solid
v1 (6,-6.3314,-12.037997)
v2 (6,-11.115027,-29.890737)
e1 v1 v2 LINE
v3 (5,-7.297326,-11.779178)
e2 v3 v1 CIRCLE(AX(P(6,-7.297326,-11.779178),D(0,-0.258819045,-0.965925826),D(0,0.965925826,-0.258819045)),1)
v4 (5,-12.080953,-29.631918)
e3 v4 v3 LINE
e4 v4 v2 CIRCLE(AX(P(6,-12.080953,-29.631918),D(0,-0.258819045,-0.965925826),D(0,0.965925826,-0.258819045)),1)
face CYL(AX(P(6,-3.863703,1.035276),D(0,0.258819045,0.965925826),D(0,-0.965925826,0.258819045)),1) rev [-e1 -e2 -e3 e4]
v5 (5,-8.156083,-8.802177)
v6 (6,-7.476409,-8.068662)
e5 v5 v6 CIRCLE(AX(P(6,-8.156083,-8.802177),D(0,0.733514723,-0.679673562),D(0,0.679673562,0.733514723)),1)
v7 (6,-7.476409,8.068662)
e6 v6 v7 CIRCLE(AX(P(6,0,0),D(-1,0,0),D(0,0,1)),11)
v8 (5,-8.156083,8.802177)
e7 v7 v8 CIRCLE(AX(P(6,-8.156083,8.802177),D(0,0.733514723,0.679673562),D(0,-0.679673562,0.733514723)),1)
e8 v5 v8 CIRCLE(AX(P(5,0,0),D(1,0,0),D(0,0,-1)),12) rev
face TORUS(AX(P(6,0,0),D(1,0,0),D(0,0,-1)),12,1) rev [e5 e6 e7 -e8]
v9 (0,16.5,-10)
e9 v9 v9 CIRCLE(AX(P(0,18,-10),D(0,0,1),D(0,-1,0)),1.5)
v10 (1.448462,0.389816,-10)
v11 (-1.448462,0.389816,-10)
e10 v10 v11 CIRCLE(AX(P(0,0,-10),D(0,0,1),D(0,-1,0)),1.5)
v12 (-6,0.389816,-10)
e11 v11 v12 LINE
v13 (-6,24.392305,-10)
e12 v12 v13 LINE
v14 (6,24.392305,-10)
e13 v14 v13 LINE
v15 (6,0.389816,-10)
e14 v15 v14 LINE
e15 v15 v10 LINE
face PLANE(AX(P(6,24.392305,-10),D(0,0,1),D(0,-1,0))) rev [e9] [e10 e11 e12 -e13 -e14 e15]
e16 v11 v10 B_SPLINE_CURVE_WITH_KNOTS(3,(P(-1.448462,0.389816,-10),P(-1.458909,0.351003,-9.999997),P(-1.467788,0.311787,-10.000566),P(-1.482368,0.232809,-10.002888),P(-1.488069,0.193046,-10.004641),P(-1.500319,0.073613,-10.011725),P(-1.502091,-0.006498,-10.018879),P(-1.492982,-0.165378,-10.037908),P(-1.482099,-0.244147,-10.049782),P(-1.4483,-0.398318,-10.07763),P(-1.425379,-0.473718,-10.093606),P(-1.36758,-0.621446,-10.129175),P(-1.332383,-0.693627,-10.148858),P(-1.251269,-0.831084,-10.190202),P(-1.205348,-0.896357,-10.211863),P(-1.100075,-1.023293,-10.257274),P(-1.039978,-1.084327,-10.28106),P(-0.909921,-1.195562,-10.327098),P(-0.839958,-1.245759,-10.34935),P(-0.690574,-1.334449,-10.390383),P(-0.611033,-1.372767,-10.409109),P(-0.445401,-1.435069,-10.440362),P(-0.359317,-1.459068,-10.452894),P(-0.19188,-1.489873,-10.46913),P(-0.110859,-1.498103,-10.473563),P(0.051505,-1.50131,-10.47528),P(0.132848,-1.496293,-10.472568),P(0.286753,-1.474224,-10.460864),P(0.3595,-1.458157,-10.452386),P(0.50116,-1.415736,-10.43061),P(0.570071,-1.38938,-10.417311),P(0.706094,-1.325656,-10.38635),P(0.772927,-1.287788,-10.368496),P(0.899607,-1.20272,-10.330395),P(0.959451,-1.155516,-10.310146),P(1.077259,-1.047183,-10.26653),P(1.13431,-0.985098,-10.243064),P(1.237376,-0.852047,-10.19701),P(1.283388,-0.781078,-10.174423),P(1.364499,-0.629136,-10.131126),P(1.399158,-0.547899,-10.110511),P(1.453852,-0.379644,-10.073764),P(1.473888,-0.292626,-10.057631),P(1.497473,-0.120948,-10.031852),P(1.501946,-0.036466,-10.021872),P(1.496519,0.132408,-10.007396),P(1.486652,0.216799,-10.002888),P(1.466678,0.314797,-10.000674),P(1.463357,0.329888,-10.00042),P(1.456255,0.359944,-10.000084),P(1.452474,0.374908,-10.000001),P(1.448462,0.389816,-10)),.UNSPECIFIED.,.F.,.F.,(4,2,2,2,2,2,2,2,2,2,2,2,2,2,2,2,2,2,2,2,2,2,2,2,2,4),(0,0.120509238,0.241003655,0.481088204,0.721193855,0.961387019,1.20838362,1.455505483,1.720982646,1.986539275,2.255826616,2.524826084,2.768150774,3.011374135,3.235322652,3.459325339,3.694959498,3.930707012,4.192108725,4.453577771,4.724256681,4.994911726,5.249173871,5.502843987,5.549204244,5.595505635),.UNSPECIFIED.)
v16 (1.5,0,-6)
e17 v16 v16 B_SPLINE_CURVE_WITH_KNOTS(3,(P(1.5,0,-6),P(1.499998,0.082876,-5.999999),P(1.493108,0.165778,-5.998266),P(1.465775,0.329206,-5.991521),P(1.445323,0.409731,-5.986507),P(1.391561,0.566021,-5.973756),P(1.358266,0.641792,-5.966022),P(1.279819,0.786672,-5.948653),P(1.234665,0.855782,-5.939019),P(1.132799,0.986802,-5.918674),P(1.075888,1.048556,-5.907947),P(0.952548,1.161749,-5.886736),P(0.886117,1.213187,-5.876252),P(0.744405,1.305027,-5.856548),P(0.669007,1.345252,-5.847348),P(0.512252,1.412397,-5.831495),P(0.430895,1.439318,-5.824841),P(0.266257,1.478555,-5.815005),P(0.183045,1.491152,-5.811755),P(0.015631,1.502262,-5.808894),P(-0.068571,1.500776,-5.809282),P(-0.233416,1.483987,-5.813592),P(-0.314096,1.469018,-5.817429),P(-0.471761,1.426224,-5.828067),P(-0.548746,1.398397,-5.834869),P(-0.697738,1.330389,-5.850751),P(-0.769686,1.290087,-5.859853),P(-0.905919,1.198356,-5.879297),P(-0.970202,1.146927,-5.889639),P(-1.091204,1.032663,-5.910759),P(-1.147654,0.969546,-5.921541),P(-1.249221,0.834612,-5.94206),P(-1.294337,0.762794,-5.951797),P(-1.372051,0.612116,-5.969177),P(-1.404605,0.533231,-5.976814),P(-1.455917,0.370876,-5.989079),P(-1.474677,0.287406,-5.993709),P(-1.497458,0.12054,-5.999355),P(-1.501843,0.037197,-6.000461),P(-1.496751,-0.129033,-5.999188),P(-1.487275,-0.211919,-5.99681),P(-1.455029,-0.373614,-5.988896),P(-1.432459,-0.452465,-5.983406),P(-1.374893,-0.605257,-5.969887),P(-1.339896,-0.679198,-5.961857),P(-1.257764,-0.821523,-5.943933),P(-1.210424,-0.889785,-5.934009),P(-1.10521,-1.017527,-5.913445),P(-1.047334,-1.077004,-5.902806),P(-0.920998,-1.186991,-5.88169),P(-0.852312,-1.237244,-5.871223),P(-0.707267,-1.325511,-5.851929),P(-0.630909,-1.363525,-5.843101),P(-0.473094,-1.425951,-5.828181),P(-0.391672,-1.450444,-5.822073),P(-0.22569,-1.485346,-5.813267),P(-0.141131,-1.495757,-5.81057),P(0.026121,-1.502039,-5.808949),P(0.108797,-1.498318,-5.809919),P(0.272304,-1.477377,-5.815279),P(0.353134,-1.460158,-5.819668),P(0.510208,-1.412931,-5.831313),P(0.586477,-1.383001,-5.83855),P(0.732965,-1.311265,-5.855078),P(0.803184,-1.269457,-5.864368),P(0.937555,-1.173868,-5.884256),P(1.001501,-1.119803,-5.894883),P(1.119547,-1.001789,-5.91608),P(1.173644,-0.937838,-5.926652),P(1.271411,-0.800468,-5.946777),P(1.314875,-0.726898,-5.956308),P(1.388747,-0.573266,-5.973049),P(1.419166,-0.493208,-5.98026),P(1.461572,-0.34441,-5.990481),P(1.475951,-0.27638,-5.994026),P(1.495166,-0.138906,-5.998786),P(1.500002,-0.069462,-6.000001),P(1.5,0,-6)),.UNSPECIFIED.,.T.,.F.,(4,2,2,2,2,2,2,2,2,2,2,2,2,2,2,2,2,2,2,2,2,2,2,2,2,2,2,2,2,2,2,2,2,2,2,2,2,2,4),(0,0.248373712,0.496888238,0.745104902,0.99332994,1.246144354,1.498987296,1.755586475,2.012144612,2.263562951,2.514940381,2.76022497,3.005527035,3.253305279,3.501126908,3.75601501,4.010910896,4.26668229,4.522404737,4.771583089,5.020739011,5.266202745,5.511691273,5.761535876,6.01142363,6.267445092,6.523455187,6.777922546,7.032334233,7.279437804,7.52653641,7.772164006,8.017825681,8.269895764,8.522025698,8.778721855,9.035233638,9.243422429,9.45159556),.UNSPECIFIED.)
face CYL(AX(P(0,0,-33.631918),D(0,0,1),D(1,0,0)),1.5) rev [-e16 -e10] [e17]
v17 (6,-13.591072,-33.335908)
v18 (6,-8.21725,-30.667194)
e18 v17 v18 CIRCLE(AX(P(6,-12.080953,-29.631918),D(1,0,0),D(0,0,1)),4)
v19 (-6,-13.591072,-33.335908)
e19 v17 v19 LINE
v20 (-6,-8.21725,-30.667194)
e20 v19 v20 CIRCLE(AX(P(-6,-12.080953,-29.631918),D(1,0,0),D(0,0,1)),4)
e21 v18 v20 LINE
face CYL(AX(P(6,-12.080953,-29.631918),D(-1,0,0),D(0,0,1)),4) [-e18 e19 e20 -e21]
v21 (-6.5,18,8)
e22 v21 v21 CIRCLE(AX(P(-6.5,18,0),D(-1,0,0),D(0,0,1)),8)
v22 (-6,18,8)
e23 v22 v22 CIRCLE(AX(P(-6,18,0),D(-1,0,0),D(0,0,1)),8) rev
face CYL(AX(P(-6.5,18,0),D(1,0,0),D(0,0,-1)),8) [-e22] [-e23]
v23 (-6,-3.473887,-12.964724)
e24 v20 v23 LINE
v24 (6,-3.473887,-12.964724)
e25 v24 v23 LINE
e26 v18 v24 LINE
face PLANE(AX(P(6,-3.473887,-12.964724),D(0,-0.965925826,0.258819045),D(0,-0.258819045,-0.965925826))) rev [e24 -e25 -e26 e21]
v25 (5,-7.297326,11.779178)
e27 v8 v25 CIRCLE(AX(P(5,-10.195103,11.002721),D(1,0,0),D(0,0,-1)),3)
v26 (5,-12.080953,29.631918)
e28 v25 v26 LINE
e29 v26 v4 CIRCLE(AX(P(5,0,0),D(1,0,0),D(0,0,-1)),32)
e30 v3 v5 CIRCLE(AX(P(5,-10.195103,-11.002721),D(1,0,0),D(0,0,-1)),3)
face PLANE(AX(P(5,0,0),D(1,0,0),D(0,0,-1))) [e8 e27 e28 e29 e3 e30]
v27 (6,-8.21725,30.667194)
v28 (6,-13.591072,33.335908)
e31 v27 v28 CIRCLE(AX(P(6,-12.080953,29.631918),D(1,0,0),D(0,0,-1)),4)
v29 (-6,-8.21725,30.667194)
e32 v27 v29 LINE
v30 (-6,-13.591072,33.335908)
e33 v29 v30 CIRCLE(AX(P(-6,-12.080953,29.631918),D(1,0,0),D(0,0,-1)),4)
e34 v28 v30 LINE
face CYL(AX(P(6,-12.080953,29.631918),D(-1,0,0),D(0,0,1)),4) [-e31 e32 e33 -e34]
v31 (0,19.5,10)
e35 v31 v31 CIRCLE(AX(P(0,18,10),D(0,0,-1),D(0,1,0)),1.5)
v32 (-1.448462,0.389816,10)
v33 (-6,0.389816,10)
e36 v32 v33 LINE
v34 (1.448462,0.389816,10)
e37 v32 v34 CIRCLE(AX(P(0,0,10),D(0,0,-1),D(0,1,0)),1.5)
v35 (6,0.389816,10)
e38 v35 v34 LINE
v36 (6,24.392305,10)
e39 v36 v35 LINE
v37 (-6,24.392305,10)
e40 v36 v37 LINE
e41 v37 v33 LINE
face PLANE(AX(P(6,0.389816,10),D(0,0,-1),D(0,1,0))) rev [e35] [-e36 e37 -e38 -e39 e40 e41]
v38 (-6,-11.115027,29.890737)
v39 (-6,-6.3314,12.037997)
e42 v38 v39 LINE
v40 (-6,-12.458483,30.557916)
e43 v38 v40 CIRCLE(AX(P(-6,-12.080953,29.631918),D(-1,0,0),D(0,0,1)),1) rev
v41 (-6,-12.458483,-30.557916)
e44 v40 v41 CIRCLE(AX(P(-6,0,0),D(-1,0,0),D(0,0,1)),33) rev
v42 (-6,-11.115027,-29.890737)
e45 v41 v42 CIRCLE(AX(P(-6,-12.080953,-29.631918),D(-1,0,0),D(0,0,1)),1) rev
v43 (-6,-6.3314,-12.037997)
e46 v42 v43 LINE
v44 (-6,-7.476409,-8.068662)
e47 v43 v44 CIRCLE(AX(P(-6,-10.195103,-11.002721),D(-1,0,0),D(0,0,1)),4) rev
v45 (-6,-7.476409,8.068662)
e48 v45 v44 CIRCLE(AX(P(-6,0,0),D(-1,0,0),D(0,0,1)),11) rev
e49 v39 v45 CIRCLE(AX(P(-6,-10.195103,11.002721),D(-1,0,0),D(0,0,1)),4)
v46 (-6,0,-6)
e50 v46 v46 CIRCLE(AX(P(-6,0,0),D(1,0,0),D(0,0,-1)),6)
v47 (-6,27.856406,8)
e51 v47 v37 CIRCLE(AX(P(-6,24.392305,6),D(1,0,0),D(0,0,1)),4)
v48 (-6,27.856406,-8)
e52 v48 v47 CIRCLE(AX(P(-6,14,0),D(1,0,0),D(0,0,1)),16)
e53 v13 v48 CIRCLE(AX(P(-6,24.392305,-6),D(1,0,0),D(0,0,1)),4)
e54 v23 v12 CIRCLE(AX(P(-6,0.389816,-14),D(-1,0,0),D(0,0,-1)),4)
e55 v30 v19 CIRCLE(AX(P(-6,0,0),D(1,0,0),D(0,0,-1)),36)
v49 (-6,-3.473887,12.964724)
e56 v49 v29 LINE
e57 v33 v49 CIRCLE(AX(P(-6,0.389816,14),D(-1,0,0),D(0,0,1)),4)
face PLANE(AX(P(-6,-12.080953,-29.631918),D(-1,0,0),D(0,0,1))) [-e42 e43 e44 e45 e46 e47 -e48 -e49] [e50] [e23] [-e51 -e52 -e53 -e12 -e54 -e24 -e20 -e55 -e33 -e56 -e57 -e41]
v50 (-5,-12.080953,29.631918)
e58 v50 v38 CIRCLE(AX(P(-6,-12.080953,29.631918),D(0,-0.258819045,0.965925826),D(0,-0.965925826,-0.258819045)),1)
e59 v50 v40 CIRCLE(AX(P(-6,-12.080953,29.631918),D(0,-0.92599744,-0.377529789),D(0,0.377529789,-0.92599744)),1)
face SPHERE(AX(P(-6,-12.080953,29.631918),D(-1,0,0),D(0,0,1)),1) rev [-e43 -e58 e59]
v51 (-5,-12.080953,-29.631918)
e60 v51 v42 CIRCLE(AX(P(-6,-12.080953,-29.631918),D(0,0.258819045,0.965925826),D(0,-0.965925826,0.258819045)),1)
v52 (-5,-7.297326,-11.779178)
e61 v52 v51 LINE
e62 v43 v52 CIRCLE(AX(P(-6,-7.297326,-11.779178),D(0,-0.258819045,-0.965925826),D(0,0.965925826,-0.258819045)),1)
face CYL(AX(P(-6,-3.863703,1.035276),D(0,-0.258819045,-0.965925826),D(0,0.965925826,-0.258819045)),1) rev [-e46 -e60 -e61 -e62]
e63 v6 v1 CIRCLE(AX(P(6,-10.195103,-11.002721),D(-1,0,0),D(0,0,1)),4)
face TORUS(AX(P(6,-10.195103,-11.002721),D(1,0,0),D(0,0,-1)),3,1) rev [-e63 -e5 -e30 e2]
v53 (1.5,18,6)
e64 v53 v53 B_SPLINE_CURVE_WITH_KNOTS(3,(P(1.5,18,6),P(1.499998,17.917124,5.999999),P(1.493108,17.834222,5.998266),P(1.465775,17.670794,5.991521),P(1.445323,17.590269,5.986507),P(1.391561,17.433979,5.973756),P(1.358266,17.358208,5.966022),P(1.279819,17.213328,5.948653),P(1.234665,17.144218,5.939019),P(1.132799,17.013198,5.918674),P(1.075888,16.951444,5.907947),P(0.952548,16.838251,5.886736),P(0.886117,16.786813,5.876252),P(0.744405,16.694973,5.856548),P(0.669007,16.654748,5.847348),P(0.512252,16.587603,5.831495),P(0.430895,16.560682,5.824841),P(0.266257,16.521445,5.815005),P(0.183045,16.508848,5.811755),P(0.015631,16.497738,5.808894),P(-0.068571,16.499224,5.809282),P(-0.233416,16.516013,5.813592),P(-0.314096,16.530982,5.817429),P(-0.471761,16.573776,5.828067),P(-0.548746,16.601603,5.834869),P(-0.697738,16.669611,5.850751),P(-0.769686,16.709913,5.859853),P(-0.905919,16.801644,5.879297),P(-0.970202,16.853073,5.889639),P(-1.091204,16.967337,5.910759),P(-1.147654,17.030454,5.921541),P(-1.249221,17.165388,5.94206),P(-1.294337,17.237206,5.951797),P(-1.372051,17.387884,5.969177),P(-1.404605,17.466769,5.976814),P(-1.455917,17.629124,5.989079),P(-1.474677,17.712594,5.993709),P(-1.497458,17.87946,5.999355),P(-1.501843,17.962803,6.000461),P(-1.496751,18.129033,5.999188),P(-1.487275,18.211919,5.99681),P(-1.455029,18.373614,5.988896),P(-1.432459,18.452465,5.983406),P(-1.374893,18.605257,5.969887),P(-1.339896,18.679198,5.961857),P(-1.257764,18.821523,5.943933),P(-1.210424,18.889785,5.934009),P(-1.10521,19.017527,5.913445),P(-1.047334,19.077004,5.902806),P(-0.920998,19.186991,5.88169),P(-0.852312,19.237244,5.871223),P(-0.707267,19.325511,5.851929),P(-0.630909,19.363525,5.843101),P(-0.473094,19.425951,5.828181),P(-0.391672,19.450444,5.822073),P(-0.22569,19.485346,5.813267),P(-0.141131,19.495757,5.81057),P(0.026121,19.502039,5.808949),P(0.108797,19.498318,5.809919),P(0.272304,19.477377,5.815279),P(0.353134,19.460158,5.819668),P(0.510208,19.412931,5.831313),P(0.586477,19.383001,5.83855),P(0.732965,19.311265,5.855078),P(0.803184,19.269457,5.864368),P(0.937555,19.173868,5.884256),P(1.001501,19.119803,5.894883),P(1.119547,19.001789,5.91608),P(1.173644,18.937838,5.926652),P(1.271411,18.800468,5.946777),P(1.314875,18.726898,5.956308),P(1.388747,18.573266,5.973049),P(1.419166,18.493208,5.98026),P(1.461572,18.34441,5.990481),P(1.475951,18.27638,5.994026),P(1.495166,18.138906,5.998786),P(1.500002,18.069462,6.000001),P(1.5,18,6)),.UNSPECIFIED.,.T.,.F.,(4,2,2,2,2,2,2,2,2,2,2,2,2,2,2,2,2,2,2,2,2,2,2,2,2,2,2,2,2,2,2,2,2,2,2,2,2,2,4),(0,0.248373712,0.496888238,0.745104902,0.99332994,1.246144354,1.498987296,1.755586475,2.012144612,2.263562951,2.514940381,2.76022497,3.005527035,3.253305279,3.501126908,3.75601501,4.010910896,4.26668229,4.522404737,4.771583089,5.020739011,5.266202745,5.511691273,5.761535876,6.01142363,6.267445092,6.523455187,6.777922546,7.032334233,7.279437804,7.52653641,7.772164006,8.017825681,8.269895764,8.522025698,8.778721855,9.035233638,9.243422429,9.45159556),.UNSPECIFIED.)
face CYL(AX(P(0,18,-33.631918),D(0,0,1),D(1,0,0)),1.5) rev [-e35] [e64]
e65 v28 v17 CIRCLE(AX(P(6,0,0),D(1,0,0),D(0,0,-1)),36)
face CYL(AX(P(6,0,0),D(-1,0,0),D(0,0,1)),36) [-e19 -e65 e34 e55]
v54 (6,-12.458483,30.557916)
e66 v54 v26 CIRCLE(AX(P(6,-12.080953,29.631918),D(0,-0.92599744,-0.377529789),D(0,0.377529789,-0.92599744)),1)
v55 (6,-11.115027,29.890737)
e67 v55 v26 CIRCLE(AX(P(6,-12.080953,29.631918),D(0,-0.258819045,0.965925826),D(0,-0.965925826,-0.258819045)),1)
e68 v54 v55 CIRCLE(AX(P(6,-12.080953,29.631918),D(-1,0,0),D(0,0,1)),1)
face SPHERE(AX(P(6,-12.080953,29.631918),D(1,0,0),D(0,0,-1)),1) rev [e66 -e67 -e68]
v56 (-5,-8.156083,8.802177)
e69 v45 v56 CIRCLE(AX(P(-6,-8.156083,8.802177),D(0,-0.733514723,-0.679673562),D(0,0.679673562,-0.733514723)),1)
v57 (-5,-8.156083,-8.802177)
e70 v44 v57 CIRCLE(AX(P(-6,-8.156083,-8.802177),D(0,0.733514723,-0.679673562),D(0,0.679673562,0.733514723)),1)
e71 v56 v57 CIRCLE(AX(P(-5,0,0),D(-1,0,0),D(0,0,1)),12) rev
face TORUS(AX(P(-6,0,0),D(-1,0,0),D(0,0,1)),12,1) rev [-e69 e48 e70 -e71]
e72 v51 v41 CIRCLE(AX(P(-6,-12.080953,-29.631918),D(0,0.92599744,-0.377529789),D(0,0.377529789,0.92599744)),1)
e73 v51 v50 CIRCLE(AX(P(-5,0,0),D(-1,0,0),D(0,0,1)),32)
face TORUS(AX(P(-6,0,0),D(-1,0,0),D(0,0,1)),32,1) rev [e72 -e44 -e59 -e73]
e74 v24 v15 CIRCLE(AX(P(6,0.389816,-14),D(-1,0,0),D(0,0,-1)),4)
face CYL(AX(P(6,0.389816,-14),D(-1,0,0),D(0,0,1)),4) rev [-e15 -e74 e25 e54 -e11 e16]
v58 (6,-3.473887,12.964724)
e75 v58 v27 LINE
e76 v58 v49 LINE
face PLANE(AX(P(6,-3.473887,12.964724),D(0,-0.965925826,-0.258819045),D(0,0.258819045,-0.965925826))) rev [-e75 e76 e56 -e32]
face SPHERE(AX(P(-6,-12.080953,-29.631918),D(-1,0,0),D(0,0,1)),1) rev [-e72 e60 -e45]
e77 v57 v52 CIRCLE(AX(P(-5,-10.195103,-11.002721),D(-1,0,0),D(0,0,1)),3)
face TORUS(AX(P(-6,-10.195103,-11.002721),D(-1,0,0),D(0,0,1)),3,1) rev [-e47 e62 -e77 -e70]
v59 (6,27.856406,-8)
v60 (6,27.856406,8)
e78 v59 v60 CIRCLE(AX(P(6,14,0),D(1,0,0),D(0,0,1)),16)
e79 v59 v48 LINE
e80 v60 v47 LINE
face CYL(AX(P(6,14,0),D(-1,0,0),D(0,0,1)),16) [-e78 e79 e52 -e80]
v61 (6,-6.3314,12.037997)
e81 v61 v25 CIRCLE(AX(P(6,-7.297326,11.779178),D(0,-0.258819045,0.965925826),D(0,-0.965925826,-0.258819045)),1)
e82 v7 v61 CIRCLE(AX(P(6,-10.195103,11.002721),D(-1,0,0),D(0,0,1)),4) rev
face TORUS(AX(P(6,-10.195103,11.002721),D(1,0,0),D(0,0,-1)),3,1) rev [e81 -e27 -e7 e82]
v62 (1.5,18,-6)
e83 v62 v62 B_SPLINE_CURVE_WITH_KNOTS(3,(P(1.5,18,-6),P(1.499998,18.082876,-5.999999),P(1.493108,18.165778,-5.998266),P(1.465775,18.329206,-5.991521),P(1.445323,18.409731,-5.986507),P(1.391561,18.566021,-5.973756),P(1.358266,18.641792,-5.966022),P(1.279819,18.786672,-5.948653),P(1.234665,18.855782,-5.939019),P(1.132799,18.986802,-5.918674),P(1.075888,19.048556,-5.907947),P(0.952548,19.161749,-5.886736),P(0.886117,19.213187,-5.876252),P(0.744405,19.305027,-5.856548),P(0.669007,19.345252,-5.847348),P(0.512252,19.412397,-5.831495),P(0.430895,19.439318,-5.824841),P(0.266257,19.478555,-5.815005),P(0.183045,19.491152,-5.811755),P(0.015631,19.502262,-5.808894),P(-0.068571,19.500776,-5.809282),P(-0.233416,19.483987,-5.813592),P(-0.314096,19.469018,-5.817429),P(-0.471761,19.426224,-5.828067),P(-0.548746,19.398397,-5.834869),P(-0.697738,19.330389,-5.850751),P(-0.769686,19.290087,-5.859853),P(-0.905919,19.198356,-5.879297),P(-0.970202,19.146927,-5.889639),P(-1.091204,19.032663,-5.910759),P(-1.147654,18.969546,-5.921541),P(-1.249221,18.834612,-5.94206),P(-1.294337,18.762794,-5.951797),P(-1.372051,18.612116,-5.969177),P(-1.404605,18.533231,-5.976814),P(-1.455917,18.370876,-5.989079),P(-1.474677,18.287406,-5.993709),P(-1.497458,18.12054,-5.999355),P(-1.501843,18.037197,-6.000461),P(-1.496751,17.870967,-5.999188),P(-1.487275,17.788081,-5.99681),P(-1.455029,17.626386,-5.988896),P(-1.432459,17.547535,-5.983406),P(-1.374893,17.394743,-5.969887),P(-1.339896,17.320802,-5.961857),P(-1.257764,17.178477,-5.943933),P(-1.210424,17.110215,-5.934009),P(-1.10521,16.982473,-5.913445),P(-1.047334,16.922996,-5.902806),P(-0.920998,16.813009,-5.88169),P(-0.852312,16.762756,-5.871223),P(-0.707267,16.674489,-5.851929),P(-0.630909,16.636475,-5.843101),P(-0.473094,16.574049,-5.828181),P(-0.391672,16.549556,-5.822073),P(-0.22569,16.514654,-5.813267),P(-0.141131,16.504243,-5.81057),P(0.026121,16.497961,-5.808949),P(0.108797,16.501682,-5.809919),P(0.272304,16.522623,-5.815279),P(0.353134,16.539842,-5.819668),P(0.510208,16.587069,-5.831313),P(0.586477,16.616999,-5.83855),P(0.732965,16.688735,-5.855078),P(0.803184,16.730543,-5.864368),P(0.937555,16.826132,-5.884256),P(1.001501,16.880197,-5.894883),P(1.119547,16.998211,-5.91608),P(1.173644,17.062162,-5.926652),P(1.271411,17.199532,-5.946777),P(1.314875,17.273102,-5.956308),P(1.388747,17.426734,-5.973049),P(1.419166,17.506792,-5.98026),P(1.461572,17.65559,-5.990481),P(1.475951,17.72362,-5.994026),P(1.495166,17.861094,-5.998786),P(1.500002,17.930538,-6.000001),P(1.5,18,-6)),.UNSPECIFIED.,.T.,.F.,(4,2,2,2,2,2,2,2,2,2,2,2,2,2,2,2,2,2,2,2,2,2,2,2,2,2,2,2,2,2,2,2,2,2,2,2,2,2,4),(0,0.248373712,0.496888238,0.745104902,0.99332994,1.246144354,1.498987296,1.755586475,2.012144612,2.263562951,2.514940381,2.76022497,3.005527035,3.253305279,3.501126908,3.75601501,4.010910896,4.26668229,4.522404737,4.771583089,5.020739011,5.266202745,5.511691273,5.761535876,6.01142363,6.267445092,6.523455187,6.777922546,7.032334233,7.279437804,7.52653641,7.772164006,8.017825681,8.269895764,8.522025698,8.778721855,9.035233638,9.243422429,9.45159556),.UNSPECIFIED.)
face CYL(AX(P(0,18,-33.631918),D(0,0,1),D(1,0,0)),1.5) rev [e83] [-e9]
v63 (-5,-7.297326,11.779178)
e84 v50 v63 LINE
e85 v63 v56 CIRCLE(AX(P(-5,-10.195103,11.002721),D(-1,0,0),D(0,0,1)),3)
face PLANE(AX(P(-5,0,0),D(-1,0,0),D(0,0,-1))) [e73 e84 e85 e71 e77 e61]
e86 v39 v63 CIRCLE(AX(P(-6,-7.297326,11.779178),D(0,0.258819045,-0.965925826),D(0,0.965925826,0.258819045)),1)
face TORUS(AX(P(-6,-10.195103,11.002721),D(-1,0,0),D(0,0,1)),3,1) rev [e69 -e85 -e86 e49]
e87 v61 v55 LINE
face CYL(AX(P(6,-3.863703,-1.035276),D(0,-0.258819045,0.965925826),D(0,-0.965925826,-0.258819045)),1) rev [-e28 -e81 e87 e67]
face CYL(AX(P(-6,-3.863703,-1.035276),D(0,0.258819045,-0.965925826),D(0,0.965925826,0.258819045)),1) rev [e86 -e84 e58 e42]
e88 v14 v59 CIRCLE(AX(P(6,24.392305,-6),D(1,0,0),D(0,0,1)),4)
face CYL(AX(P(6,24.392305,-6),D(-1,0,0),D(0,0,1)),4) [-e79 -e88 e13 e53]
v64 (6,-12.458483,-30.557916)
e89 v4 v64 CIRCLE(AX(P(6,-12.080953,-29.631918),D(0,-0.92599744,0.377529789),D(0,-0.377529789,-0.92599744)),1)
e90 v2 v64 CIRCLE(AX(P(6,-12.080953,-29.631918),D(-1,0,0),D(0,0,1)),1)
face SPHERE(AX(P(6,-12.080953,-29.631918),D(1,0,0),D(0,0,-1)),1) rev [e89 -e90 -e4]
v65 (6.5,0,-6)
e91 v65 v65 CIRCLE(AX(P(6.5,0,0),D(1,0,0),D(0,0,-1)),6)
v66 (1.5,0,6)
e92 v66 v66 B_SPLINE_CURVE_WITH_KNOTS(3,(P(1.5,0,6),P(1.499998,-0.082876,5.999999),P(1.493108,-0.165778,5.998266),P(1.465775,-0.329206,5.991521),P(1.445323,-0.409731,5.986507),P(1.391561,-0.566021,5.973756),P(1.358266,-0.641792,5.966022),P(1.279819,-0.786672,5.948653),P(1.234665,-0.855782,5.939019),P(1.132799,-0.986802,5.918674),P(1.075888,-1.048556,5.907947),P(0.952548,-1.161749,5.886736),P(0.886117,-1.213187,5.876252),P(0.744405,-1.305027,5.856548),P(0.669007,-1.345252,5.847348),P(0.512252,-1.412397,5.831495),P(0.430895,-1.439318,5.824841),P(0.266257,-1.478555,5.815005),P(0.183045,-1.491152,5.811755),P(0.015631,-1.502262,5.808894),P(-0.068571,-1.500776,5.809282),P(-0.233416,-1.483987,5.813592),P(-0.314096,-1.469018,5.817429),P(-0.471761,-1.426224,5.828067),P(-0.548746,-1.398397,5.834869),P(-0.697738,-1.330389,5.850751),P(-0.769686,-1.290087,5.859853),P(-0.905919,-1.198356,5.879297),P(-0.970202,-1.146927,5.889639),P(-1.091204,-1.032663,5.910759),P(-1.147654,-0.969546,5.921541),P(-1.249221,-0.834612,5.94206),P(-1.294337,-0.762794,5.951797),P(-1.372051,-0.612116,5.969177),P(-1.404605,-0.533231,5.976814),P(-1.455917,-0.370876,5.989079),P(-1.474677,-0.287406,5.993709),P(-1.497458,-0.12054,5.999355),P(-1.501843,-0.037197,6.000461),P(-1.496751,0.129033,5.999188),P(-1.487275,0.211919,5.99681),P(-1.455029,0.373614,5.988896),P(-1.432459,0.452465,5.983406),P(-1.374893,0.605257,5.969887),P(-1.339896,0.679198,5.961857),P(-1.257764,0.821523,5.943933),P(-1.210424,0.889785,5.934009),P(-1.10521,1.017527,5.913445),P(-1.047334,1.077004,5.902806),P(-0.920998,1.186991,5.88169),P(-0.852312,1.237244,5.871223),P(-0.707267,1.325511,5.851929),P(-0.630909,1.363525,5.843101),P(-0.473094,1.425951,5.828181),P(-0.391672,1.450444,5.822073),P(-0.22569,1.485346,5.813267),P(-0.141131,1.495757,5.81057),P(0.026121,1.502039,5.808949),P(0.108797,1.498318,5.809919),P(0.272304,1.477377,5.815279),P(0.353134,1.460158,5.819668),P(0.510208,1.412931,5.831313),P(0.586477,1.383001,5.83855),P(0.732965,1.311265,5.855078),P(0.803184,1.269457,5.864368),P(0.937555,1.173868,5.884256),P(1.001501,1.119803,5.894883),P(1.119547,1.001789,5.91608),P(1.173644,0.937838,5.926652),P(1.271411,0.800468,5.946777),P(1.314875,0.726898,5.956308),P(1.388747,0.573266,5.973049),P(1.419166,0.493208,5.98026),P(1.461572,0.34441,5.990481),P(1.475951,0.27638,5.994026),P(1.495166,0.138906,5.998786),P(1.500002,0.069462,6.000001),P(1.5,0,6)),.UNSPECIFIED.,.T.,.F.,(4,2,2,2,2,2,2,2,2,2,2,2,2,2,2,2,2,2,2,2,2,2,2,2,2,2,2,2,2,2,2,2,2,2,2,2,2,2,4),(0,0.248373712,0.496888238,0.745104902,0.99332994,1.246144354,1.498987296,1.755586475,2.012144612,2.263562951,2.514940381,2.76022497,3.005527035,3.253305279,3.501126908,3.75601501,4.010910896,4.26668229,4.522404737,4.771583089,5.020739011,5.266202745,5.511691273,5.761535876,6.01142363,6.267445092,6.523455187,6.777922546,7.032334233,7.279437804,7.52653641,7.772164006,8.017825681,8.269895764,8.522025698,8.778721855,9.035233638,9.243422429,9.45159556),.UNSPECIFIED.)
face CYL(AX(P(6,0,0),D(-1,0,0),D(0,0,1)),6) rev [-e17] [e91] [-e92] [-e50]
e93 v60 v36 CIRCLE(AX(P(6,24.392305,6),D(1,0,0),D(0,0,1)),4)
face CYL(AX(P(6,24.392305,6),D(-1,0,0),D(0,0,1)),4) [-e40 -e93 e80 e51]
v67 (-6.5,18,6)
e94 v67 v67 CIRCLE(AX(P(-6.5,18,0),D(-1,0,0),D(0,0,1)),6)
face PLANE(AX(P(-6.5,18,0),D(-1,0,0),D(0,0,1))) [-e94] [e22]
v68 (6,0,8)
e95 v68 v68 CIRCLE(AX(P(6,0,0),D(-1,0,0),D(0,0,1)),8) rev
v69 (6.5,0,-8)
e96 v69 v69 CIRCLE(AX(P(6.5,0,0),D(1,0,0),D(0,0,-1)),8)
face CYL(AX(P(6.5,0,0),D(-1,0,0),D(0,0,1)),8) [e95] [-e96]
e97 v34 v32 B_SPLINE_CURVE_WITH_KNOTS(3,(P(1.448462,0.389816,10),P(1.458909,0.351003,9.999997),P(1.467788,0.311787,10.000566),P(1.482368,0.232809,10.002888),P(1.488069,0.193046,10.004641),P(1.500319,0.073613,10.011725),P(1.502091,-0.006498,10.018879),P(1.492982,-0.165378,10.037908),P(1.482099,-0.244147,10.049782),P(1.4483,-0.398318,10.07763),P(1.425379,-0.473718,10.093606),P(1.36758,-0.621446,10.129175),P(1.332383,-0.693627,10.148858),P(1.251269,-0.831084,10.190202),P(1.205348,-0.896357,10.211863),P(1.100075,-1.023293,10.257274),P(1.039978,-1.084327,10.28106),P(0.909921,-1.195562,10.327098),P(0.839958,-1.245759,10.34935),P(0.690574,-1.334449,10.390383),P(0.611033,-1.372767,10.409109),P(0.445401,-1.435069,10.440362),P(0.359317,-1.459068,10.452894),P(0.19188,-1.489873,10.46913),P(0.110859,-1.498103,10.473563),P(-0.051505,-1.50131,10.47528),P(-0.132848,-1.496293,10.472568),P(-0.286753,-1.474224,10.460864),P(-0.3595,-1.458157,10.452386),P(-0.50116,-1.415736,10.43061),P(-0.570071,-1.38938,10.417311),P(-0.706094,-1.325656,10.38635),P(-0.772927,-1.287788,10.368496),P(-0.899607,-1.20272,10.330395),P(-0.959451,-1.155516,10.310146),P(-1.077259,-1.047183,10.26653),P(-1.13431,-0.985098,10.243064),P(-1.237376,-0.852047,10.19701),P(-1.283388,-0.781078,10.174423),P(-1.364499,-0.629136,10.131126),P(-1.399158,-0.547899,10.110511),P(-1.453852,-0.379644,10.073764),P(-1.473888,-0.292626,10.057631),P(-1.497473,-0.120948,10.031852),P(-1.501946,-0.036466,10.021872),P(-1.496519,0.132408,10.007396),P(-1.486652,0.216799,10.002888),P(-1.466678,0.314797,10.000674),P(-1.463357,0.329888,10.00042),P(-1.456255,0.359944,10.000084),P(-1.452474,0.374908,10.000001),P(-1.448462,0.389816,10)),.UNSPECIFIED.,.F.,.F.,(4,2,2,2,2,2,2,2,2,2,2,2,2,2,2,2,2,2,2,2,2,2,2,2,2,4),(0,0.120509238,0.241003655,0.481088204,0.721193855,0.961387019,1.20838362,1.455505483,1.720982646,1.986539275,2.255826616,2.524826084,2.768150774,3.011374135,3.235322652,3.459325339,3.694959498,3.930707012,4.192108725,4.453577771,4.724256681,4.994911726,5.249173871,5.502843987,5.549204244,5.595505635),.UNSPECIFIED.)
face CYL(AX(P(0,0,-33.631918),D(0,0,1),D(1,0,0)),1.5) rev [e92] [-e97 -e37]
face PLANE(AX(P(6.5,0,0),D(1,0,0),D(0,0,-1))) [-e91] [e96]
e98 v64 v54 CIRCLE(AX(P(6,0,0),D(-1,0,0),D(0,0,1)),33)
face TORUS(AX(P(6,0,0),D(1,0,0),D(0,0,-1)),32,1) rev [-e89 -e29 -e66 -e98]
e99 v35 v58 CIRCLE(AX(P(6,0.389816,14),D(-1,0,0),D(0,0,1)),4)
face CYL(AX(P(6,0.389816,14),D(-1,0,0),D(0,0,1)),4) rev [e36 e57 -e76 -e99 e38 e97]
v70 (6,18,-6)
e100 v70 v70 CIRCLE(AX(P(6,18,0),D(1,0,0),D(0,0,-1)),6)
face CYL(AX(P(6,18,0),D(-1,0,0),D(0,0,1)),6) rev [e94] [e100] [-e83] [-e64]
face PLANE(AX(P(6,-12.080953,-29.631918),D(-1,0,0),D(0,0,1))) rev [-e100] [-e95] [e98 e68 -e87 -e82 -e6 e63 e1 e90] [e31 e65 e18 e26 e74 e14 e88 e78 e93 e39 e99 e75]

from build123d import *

# Parameters (mm, degrees)
SKETCH1_R               = 6
BOSS_EXTRUDE1_DEPTH     = 6
CUT_EXTRUDE1_DEPTH      = 1
FILLET1_R               = 1
FILLET1_OF_MIRROR1_R    = 1
SKETCH3_R               = 8
SKETCH3_R_2             = 6
BOSS_EXTRUDE2_DEPTH     = 0.5
SKETCH4_R               = 8
SKETCH4_R_2             = 6
BOSS_EXTRUDE3_DEPTH     = 0.5
CUT_EXTRUDE2_DEPTH      = 50.692614274
CUT_EXTRUDE2_DEPTH_BACK = 50.692614274
SKETCH5_R               = 1.5


with BuildPart() as part:
    # Sketch1 → Boss-Extrude1 (new, symmetric)
    with BuildSketch(Plane(origin=(0, 0, 0), x_dir=(0, 0, -1), z_dir=(1, 0, 0))):
        with BuildLine():
            Line((-12.96472382, -3.473887278), (-30.667194256, -8.217249935))
            ThreePointArc((-30.667194256, -8.217249935), (-33.214466382, -10.301810854), (-33.335907835, -13.591072395))
            ThreePointArc((-33.335907835, -13.591072395), (0, -36), (33.335907835, -13.591072395))
            ThreePointArc((33.335907835, -13.591072395), (33.214466382, -10.301810854), (30.667194256, -8.217249935))
            Line((30.667194256, -8.217249935), (12.96472382, -3.473887278))
            ThreePointArc((12.96472382, -3.473887278), (10.826586639, -2.045229688), (10, 0.389816028))
            Line((10, 0.389816028), (10, 24.392304845))
            ThreePointArc((10, 24.392304845), (9.464101615, 26.392304845), (8, 27.856406461))
            ThreePointArc((8, 27.856406461), (0, 30), (-8, 27.856406461))
            ThreePointArc((-8, 27.856406461), (-9.464101615, 26.392304845), (-10, 24.392304845))
            Line((-10, 24.392304845), (-10, 0.389816028))
            ThreePointArc((-10, 0.389816028), (-10.826586639, -2.045229688), (-12.96472382, -3.473887278))
        make_face()
        Circle(SKETCH1_R, mode=Mode.SUBTRACT)
        with Locations((0, 18)):
            Circle(SKETCH1_R, mode=Mode.SUBTRACT)
    extrude(amount=BOSS_EXTRUDE1_DEPTH, both=True)

    # Sketch2 → Cut-Extrude1 (cut, symmetric)
    with BuildSketch(Plane(origin=(6, 0, 0), x_dir=(0, 0, -1), z_dir=(1, 0, 0))):
        with BuildLine():
            ThreePointArc((-12.037997029, -6.331400124), (-9.894070596, -6.35181127), (-8.068661956, -7.476409181))
            ThreePointArc((-8.068661956, -7.476409181), (0, -11), (8.068661956, -7.476409181))
            ThreePointArc((8.068661956, -7.476409181), (9.894070596, -6.35181127), (12.037997029, -6.331400124))
            Line((12.037997029, -6.331400124), (12.188266684, -6.371664756))
            Line((12.188266684, -6.371664756), (29.89073712, -11.115027414))
            ThreePointArc((29.89073712, -11.115027414), (30.527555152, -11.636167644), (30.557915515, -12.458483029))
            ThreePointArc((30.557915515, -12.458483029), (0, -33), (-30.557915515, -12.458483029))
            ThreePointArc((-30.557915515, -12.458483029), (-30.527555152, -11.636167644), (-29.89073712, -11.115027414))
            Line((-29.89073712, -11.115027414), (-12.188266684, -6.371664756))
            Line((-12.188266684, -6.371664756), (-12.037997029, -6.331400124))
        make_face()
    cut_extrude1 = extrude(amount=CUT_EXTRUDE1_DEPTH, both=True, mode=Mode.SUBTRACT)

    # Fillet1
    fillet1_edges = [part.edges().sort_by_distance(p)[0] for p in [
        (5, -11, 0),
        (5, -6.35181127, -9.894070596),
        (5, -8.723213769, -20.964367075),
        (5, -11.636167644, -30.527555152),
        (5, -33, 0),
        (5, -11.636167644, 30.527555152),
        (5, -8.723213769, 20.964367075),
        (5, -6.35181127, 9.894070596),
    ]]
    fillet(fillet1_edges, radius=FILLET1_R - 0.0001)  # a hair under: the kernel refuses the full size

    # Mirror1: Cut-Extrude1 across plane
    add(cut_extrude1.mirror(Plane(origin=(0, 0, 0), x_dir=(0, 0, 1), z_dir=(1, 0, 0))), mode=Mode.SUBTRACT)

    # Fillet1 of Mirror1
    fillet1_of_mirror1_edges = [part.edges().sort_by_distance(p)[0] for p in [
        (-5, -11, 0),
        (-5, -6.35181127, -9.894070596),
        (-5, -8.723213769, -20.964367075),
        (-5, -11.636167644, -30.527555152),
        (-5, -33, 0),
        (-5, -11.636167644, 30.527555152),
        (-5, -8.723213769, 20.964367075),
        (-5, -6.35181127, 9.894070596),
    ]]
    fillet(fillet1_of_mirror1_edges, radius=FILLET1_OF_MIRROR1_R - 0.0001)  # a hair under: the kernel refuses the full size

    # Sketch3 → Boss-Extrude2 (add, symmetric)
    with BuildSketch(Plane(origin=(6, 0, 0), x_dir=(0, 0, -1), z_dir=(1, 0, 0))):
        with Locations(Location((0, 0, 0), (0, 0, 180))):
            Circle(SKETCH3_R)
        Circle(SKETCH3_R_2, mode=Mode.SUBTRACT)
    extrude(amount=BOSS_EXTRUDE2_DEPTH, both=True)

    # Sketch4 → Boss-Extrude3 (add, symmetric)
    with BuildSketch(Plane.ZY.offset(6)):
        with Locations((0, 18)):
            Circle(SKETCH4_R)
        with Locations((0, 18)):
            Circle(SKETCH4_R_2, mode=Mode.SUBTRACT)
    extrude(amount=BOSS_EXTRUDE3_DEPTH, both=True)

    # Sketch5 → Cut-Extrude2 (cut, two sides: drawn at the far end of the back side and taken through both)
    with BuildSketch(Plane.XY.offset(-CUT_EXTRUDE2_DEPTH_BACK)):
        with Locations((0, 18)):
            Circle(SKETCH5_R)
        Circle(SKETCH5_R)
    extrude(amount=CUT_EXTRUDE2_DEPTH + CUT_EXTRUDE2_DEPTH_BACK, mode=Mode.SUBTRACT)


solid = part.part
